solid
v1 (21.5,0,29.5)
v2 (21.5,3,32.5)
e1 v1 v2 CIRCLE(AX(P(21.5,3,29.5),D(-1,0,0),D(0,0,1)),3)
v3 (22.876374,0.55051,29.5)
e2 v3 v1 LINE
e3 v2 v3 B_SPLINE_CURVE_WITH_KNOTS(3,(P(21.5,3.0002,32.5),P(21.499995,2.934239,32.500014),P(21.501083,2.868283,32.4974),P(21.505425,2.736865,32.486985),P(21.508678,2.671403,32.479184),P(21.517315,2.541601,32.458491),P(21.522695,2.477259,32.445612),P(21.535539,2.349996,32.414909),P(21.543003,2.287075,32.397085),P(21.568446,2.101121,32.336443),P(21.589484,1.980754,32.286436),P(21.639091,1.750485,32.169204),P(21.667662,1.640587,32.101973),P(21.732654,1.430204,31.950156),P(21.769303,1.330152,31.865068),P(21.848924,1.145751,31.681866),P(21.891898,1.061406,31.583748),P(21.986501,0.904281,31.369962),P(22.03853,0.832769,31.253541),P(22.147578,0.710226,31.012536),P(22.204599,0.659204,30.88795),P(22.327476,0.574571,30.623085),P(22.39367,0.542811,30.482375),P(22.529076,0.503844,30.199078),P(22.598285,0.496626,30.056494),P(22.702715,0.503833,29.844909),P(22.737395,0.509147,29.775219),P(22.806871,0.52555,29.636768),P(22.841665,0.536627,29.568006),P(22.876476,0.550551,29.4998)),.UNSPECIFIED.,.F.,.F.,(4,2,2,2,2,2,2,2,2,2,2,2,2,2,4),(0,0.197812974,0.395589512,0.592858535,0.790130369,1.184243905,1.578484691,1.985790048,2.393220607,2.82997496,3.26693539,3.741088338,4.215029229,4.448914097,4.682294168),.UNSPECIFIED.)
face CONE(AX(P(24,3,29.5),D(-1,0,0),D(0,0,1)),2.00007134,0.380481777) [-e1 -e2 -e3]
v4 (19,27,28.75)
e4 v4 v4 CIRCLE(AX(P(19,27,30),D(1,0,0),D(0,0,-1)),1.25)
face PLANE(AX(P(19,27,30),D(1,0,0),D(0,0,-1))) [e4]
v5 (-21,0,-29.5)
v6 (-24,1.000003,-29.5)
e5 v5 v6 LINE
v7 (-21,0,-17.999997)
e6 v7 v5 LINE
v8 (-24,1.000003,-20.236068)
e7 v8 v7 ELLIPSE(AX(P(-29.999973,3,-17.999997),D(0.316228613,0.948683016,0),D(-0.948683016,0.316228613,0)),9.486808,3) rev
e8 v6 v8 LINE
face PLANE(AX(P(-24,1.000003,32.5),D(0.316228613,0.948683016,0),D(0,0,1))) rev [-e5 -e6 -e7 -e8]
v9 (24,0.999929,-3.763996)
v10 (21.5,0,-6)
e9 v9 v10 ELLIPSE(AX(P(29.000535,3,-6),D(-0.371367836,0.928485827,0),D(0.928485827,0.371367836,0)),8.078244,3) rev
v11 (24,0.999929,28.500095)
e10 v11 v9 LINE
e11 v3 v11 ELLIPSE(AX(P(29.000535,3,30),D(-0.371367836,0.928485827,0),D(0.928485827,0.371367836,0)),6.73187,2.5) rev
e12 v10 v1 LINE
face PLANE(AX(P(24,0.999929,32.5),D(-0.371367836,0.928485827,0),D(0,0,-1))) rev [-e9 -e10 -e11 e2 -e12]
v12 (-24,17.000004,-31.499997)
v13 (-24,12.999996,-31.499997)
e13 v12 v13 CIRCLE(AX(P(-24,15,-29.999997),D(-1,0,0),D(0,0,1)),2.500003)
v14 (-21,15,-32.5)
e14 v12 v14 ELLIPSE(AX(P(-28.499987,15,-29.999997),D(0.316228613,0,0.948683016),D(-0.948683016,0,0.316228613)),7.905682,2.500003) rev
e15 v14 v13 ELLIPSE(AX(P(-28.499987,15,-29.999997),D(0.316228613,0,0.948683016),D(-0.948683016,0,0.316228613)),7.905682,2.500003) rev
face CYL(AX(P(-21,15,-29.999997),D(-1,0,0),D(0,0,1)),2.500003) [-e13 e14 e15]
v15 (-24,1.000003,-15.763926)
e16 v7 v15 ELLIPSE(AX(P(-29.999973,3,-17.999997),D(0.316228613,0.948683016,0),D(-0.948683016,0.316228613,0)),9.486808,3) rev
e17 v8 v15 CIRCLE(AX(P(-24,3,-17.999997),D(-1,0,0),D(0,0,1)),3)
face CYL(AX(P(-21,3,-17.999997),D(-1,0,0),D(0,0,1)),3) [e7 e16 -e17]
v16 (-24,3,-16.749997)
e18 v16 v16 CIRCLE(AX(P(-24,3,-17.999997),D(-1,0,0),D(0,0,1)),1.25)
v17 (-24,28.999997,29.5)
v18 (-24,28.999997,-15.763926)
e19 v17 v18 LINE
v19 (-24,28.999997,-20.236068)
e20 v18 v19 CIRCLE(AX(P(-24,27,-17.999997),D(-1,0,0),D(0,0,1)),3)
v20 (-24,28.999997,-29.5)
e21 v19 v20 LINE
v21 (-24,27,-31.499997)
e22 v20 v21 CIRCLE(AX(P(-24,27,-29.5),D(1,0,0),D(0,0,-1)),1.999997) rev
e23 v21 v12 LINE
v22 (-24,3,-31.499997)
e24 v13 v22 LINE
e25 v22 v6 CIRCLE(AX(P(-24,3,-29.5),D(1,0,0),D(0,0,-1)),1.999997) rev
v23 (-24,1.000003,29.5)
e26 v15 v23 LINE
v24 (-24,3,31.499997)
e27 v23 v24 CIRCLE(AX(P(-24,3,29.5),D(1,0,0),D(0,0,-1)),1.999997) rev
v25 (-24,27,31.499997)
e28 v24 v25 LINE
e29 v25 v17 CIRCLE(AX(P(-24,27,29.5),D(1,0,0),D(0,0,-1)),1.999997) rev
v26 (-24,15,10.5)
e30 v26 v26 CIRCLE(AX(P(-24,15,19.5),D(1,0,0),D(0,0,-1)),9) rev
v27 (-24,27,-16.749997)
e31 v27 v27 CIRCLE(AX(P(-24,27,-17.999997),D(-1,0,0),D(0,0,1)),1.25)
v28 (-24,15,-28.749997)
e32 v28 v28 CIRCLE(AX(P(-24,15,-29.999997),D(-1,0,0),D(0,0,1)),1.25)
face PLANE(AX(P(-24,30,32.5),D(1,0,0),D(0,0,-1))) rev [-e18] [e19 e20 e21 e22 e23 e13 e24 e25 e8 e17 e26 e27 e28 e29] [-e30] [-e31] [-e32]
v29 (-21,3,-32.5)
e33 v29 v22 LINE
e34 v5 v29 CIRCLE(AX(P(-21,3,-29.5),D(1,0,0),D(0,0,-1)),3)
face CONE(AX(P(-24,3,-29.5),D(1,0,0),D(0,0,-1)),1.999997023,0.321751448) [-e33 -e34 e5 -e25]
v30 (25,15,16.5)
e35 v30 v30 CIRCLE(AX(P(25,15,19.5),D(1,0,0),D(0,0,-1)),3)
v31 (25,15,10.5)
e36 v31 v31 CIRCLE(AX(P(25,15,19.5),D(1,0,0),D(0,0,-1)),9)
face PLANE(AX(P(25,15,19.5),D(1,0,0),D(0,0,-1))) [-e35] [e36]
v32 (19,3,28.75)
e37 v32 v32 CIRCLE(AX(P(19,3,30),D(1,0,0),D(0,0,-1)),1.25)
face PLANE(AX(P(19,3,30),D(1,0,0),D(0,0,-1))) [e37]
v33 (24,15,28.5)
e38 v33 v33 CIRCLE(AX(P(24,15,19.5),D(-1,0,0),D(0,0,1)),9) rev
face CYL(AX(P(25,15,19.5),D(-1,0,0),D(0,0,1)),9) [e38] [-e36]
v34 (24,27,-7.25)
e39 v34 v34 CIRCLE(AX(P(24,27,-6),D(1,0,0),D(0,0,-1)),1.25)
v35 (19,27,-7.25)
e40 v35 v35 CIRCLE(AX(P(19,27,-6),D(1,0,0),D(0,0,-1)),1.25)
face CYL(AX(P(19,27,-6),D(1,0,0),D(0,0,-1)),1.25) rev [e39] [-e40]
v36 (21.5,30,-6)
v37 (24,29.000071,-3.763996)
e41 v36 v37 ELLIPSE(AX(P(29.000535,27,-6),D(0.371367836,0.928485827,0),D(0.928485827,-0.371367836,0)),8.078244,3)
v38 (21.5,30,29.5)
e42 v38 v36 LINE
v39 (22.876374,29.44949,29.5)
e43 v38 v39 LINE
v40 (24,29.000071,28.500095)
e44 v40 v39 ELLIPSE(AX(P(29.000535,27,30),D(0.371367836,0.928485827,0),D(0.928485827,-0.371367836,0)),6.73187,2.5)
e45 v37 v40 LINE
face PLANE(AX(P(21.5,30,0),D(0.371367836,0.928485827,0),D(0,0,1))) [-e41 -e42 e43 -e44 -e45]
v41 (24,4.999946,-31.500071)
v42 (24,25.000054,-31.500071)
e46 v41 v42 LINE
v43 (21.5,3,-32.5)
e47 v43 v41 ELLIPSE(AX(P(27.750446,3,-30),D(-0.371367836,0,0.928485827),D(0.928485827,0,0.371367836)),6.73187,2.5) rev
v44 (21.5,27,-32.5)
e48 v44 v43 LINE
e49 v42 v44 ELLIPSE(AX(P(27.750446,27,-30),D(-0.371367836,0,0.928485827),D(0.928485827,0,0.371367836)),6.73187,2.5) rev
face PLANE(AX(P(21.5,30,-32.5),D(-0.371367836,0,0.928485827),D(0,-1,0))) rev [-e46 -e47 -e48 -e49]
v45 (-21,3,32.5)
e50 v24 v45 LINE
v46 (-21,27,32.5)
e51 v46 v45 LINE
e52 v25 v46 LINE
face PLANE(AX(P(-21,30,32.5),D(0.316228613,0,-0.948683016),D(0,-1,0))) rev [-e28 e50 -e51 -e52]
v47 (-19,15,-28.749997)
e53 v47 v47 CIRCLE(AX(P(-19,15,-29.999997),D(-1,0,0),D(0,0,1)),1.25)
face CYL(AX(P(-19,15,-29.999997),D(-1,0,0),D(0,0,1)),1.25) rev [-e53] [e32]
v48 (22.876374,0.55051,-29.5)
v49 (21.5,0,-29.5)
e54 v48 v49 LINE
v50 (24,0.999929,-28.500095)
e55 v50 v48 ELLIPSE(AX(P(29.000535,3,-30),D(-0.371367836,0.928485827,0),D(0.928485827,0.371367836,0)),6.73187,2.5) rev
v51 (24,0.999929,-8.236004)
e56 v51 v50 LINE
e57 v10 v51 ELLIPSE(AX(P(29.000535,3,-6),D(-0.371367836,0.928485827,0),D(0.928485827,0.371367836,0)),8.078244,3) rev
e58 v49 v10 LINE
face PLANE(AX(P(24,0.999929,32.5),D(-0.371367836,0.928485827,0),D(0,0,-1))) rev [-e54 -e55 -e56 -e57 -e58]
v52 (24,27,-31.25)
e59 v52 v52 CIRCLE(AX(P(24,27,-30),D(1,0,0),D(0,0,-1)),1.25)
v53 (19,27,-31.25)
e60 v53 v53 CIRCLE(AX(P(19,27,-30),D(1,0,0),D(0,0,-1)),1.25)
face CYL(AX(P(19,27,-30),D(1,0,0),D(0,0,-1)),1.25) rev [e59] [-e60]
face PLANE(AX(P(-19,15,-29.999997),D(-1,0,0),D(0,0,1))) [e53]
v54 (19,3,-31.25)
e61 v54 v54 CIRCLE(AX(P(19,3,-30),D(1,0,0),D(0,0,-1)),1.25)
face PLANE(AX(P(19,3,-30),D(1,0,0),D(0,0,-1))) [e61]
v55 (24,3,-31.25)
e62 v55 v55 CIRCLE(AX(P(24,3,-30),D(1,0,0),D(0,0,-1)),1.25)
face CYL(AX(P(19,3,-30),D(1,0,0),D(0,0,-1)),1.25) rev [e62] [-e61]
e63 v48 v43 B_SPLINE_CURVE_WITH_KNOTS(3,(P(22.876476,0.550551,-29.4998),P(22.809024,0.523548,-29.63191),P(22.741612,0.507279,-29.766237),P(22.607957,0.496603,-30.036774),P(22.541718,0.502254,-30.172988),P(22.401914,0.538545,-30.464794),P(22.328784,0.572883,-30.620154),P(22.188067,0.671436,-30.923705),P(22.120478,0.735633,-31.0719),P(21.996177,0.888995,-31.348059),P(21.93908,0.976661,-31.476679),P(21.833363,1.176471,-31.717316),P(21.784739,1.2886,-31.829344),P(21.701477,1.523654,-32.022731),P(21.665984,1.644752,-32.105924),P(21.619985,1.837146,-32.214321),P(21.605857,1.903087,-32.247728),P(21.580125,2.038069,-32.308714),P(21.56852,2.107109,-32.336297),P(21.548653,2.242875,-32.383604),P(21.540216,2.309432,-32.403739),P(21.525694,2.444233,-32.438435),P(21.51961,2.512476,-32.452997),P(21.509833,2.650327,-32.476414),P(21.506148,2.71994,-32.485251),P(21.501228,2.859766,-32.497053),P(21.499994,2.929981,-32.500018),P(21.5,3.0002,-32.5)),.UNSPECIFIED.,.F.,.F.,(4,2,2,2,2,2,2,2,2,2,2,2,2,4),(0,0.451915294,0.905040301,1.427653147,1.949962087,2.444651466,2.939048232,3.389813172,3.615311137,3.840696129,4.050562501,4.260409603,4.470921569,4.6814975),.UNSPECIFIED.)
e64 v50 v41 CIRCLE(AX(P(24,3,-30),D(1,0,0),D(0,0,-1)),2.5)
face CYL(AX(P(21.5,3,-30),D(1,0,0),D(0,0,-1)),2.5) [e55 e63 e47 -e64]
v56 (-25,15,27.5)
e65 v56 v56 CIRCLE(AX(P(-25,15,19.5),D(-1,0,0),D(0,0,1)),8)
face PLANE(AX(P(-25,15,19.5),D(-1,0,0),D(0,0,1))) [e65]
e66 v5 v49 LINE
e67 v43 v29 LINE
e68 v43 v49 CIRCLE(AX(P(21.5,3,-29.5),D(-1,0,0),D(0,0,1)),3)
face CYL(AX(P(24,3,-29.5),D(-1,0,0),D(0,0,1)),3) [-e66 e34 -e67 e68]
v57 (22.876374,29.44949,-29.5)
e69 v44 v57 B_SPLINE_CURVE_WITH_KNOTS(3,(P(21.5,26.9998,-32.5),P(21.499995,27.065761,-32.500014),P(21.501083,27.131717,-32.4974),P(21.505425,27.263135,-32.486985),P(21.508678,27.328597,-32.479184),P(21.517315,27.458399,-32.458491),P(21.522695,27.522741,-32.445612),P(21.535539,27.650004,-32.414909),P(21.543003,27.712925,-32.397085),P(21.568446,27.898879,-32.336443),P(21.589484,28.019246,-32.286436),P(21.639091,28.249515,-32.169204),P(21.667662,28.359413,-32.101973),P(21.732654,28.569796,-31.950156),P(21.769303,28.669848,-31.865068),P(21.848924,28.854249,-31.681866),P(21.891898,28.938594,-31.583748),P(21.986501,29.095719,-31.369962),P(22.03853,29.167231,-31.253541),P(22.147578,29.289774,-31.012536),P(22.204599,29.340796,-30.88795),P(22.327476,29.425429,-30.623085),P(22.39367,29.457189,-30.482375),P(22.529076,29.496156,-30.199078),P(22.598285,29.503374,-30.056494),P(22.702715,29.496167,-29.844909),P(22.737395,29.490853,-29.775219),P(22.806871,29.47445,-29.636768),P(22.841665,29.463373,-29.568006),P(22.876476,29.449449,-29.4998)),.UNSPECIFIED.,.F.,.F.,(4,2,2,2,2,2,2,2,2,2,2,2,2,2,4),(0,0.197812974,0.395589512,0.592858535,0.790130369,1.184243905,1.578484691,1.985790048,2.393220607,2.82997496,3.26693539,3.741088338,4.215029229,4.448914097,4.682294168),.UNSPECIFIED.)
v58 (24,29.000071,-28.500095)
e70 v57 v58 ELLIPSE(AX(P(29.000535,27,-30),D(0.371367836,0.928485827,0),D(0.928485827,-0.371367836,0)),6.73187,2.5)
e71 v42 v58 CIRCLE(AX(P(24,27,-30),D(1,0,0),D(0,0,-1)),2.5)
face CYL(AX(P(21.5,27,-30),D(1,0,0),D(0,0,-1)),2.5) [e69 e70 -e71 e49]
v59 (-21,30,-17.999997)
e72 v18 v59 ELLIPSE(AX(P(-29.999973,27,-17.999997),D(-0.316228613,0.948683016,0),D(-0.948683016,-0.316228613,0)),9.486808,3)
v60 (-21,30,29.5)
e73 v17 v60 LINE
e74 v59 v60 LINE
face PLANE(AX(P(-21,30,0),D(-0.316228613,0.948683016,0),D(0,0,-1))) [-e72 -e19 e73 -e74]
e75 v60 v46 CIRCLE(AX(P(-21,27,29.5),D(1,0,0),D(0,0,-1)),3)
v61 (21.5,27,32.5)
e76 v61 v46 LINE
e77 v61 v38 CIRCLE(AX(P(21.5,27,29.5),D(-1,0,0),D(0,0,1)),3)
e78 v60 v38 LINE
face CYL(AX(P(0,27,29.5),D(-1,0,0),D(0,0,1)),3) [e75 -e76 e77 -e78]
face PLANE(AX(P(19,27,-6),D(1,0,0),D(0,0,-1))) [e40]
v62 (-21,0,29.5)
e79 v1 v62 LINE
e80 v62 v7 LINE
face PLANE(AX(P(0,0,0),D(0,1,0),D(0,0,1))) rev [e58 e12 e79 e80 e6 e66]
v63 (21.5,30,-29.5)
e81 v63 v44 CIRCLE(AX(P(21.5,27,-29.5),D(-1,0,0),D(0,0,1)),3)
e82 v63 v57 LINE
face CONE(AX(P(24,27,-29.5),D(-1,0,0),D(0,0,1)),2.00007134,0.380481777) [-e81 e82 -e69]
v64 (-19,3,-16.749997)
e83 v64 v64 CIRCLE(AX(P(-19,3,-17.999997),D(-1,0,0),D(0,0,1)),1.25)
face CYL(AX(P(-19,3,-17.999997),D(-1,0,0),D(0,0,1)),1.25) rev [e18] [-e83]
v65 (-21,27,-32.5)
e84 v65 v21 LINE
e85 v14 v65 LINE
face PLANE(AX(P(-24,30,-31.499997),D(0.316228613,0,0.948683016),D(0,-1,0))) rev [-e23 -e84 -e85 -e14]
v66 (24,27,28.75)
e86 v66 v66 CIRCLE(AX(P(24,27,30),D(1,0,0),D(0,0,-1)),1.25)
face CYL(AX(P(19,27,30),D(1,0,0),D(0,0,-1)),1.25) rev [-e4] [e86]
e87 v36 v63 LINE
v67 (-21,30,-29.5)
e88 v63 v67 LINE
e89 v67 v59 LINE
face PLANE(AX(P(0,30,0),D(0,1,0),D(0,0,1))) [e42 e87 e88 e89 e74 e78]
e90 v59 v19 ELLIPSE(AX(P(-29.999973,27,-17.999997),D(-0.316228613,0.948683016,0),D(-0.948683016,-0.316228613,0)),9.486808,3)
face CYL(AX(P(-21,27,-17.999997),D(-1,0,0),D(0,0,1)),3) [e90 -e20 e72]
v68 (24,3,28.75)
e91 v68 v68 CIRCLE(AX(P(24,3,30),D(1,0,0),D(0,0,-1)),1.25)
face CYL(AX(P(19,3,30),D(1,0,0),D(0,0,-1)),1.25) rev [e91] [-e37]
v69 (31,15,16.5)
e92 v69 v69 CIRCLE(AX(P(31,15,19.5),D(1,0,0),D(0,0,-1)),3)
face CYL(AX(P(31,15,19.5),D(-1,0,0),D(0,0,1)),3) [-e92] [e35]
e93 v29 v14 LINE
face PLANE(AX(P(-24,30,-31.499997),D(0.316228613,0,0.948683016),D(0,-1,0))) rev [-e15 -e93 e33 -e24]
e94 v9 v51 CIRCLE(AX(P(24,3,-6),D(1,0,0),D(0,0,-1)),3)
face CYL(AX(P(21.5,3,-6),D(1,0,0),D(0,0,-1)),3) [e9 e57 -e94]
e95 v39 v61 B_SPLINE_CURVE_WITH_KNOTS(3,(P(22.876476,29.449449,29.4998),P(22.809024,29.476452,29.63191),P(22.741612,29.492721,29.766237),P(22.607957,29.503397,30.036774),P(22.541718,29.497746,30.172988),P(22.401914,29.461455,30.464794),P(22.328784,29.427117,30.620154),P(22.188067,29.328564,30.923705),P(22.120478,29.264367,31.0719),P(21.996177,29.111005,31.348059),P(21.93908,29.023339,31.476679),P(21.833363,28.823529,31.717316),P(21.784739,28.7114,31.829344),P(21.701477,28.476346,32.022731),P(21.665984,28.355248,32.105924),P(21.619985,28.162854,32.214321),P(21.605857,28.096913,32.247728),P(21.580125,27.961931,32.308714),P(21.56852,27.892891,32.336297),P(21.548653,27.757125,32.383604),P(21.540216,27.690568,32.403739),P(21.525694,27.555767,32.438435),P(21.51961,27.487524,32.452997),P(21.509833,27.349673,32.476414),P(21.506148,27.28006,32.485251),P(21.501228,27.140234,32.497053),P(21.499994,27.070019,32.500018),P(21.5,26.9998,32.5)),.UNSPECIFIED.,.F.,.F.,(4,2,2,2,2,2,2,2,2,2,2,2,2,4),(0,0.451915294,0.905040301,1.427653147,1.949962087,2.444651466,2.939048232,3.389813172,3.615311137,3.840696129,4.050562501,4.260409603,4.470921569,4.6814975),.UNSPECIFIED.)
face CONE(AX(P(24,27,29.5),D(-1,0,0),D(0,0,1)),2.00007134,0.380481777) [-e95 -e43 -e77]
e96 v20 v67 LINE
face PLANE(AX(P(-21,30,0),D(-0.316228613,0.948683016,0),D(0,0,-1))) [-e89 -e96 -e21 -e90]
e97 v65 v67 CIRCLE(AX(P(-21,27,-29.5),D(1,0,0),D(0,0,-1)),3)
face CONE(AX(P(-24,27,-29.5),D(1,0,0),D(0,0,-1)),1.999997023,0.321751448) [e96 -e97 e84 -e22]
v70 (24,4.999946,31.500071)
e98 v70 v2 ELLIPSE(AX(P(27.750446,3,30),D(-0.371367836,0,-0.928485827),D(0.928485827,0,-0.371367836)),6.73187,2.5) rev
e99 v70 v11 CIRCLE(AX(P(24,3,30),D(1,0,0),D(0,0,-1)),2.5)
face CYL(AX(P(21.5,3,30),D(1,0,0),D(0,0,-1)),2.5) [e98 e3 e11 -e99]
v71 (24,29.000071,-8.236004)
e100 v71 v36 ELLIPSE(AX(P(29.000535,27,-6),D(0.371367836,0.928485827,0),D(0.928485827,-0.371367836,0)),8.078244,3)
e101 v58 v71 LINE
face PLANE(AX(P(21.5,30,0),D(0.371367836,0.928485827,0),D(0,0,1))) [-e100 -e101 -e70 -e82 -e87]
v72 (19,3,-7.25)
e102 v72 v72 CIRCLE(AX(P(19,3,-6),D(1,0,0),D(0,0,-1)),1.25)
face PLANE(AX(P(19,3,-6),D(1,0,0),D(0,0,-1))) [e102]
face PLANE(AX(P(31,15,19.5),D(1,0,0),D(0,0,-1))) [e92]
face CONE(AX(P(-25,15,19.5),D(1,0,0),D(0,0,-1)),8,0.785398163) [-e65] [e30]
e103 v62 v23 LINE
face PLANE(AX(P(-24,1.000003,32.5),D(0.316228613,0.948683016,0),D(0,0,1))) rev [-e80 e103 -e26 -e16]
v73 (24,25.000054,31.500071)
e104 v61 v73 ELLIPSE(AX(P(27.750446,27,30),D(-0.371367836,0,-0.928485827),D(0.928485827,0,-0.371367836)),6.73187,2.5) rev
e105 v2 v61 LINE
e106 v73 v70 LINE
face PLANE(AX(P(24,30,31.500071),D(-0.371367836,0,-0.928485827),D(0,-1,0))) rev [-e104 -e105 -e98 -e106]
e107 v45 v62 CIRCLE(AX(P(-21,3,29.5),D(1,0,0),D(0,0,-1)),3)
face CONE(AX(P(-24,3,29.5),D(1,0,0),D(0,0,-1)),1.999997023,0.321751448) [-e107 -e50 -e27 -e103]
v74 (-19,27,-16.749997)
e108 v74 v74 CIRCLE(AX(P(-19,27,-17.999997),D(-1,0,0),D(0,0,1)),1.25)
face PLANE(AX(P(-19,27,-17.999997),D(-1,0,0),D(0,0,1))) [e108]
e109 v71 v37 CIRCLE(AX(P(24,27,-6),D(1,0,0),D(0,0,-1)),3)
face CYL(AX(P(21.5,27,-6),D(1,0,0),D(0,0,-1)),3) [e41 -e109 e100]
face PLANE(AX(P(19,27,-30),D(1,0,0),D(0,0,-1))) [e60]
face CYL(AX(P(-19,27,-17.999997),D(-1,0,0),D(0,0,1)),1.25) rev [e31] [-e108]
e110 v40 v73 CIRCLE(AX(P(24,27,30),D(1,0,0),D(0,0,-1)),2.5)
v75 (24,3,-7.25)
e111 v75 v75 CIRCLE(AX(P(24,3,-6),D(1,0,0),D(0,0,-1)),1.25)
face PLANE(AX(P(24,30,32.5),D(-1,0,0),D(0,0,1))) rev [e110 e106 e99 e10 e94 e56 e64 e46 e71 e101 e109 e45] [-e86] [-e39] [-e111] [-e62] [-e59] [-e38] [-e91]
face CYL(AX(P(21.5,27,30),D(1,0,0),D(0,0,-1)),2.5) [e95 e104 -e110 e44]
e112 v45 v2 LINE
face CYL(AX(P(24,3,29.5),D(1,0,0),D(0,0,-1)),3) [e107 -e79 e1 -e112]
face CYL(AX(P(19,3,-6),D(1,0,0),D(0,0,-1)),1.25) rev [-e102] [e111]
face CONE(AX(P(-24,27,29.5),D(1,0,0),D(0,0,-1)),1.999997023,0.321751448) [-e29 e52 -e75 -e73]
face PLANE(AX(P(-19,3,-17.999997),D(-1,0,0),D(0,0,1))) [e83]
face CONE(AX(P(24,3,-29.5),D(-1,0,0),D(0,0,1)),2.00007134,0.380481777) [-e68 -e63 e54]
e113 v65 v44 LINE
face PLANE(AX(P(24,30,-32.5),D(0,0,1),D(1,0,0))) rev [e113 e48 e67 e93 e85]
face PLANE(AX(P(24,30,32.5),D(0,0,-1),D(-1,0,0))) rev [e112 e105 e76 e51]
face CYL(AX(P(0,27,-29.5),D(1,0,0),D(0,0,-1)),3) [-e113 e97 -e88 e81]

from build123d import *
from OCP.BRepFilletAPI import BRepFilletAPI_MakeChamfer

# Parameters (mm, degrees)
SKETCH1_W           = 48
SKETCH1_H           = 65
BOSS_EXTRUDE1_DEPTH = 30
FILLET2_R           = 3
SKETCH2_R           = 9
BOSS_EXTRUDE2_DEPTH = 1
BOSS_EXTRUDE4_START = 1
SKETCH4_R           = 9
BOSS_EXTRUDE4_DEPTH = 1
SKETCH5_R           = 3
BOSS_EXTRUDE5_DEPTH = 6
CHAMFER1_SIZE       = 3
CHAMFER1_SIZE2      = 1.000002977
CHAMFER2_SIZE       = 1
CHAMFER3_SIZE       = 2.5
CHAMFER3_SIZE2      = 0.99992866
SKETCH6_R           = 3
SKETCH6_R_2         = 2.5
BOSS_EXTRUDE6_DEPTH = 2.5
SKETCH7_R           = 2.500002977
SKETCH7_R_2         = 3
BOSS_EXTRUDE7_DEPTH = 3
SKETCH8_R           = 1.25
CUT_EXTRUDE1_DEPTH  = 5
SKETCH10_R          = 1.25
CUT_EXTRUDE2_DEPTH  = 5


with BuildPart() as part:
    # Sketch1 → Boss-Extrude1 (new body)
    with BuildSketch(Plane(origin=(0, 0, 0), x_dir=(1, 0, 0), z_dir=(0, 1, 0))):
        Rectangle(SKETCH1_W, SKETCH1_H)
    extrude(amount=BOSS_EXTRUDE1_DEPTH)

    # Fillet2
    fillet2_edges = [part.edges().sort_by_distance(p)[0] for p in [
        (0, 30, -32.5),
        (0, 0, -32.5),
        (0, 0, 32.5),
        (0, 30, 32.5),
    ]]
    fillet(fillet2_edges, radius=FILLET2_R)

    # Sketch2 → Boss-Extrude2 (add)
    with BuildSketch(Plane.ZY.offset(24)):
        with Locations(Location((19.5, 15, 0), (0, 0, 180))):
            Circle(SKETCH2_R)
    extrude(amount=BOSS_EXTRUDE2_DEPTH)

    # Sketch4 → Boss-Extrude4 (add)
    with BuildSketch(Plane(origin=(24, 0, 0), x_dir=(0, 0, -1), z_dir=(1, 0, 0)).offset(BOSS_EXTRUDE4_START)):
        with Locations((-19.5, 15)):
            Circle(SKETCH4_R)
    extrude(amount=-BOSS_EXTRUDE4_DEPTH)

    # Sketch5 → Boss-Extrude5 (add)
    with BuildSketch(Plane(origin=(25, 0, 0), x_dir=(0, 0, -1), z_dir=(1, 0, 0))):
        with Locations((-19.5, 15)):
            Circle(SKETCH5_R)
    extrude(amount=BOSS_EXTRUDE5_DEPTH)

    # Chamfer1: one chamfer whose edges measure the first distance from different faces: ONE call of the kernel's chamfer builder (chamfer() names one face for all edges)
    chamfer1_edges_1 = [part.edges().sort_by_distance(p)[0] for p in [
        (-24, 30, 0),
    ]]
    chamfer1_side_1 = [part.faces().sort_by_distance(p)[0] for p in [
        (0, 30, 0),
    ]]
    chamfer1_edges_2 = [part.edges().sort_by_distance(p)[0] for p in [
        (-24, 0, 0),
    ]]
    chamfer1_side_2 = [part.faces().sort_by_distance(p)[0] for p in [
        (0, 0, 0),
    ]]
    chamfer1_edges_3 = [part.edges().sort_by_distance(p)[0] for p in [
        (-24, 15, 32.5),
    ]]
    chamfer1_side_3 = [part.faces().sort_by_distance(p)[0] for p in [
        (0, 15, 32.5),
    ]]
    chamfer1_edges_4 = [part.edges().sort_by_distance(p)[0] for p in [
        (-24, 15, -32.5),
    ]]
    chamfer1_side_4 = [part.faces().sort_by_distance(p)[0] for p in [
        (0, 15, -32.5),
    ]]
    chamfer1_edges_5 = [part.edges().sort_by_distance(p)[0] for p in [
        (-24, 29.121320344, 31.621320344),
    ]]
    chamfer1_side_5 = [part.faces().sort_by_distance(p)[0] for p in [
        (0, 29.121320344, 31.621320344),
    ]]
    chamfer1_edges_6 = [part.edges().sort_by_distance(p)[0] for p in [
        (-24, 0.878679656, 31.621320344),
    ]]
    chamfer1_side_6 = [part.faces().sort_by_distance(p)[0] for p in [
        (0, 0.878679656, 31.621320344),
    ]]
    chamfer1_edges_7 = [part.edges().sort_by_distance(p)[0] for p in [
        (-24, 0.878679656, -31.621320344),
    ]]
    chamfer1_side_7 = [part.faces().sort_by_distance(p)[0] for p in [
        (0, 0.878679656, -31.621320344),
    ]]
    chamfer1_edges_8 = [part.edges().sort_by_distance(p)[0] for p in [
        (-24, 29.121320344, -31.621320344),
    ]]
    chamfer1_side_8 = [part.faces().sort_by_distance(p)[0] for p in [
        (0, 29.121320344, -31.621320344),
    ]]
    chamfer1 = BRepFilletAPI_MakeChamfer(part.part.solid().wrapped)
    for e in chamfer1_edges_1:
        chamfer1.Add(CHAMFER1_SIZE, CHAMFER1_SIZE2, e.wrapped, chamfer1_side_1[0].wrapped)  # the first distance lies on this face
    for e in chamfer1_edges_2:
        chamfer1.Add(CHAMFER1_SIZE, CHAMFER1_SIZE2, e.wrapped, chamfer1_side_2[0].wrapped)  # the first distance lies on this face
    for e in chamfer1_edges_3:
        chamfer1.Add(CHAMFER1_SIZE, CHAMFER1_SIZE2, e.wrapped, chamfer1_side_3[0].wrapped)  # the first distance lies on this face
    for e in chamfer1_edges_4:
        chamfer1.Add(CHAMFER1_SIZE, CHAMFER1_SIZE2, e.wrapped, chamfer1_side_4[0].wrapped)  # the first distance lies on this face
    for e in chamfer1_edges_5:
        chamfer1.Add(CHAMFER1_SIZE, CHAMFER1_SIZE2, e.wrapped, chamfer1_side_5[0].wrapped)  # the first distance lies on this face
    for e in chamfer1_edges_6:
        chamfer1.Add(CHAMFER1_SIZE, CHAMFER1_SIZE2, e.wrapped, chamfer1_side_6[0].wrapped)  # the first distance lies on this face
    for e in chamfer1_edges_7:
        chamfer1.Add(CHAMFER1_SIZE, CHAMFER1_SIZE2, e.wrapped, chamfer1_side_7[0].wrapped)  # the first distance lies on this face
    for e in chamfer1_edges_8:
        chamfer1.Add(CHAMFER1_SIZE, CHAMFER1_SIZE2, e.wrapped, chamfer1_side_8[0].wrapped)  # the first distance lies on this face
    add(Compound.cast(chamfer1.Shape()), mode=Mode.REPLACE)

    # Chamfer2
    chamfer2_edges = [part.edges().sort_by_distance(p)[0] for p in [
        (-25, 15, 28.5),
    ]]
    chamfer(chamfer2_edges, length=CHAMFER2_SIZE - 0.0001)  # a hair under: the kernel refuses the full size

    # Chamfer3: one chamfer whose edges measure the first distance from different faces: ONE call of the kernel's chamfer builder (chamfer() names one face for all edges)
    chamfer3_edges_1 = [part.edges().sort_by_distance(p)[0] for p in [
        (24, 30, 0),
    ]]
    chamfer3_side_1 = [part.faces().sort_by_distance(p)[0] for p in [
        (1.5, 30, 0),
    ]]
    chamfer3_edges_2 = [part.edges().sort_by_distance(p)[0] for p in [
        (24, 15, -32.5),
    ]]
    chamfer3_side_2 = [part.faces().sort_by_distance(p)[0] for p in [
        (1.5, 15, -32.5),
    ]]
    chamfer3_edges_3 = [part.edges().sort_by_distance(p)[0] for p in [
        (24, 0, 0),
    ]]
    chamfer3_side_3 = [part.faces().sort_by_distance(p)[0] for p in [
        (1.5, 0, 0),
    ]]
    chamfer3_edges_4 = [part.edges().sort_by_distance(p)[0] for p in [
        (24, 15, 32.5),
    ]]
    chamfer3_side_4 = [part.faces().sort_by_distance(p)[0] for p in [
        (1.5, 15, 32.5),
    ]]
    chamfer3_edges_5 = [part.edges().sort_by_distance(p)[0] for p in [
        (24, 29.121320344, 31.621320344),
    ]]
    chamfer3_side_5 = [part.faces().sort_by_distance(p)[0] for p in [
        (1.5, 29.121320344, 31.621320344),
    ]]
    chamfer3_edges_6 = [part.edges().sort_by_distance(p)[0] for p in [
        (24, 0.878679656, 31.621320344),
    ]]
    chamfer3_side_6 = [part.faces().sort_by_distance(p)[0] for p in [
        (1.5, 0.878679656, 31.621320344),
    ]]
    chamfer3_edges_7 = [part.edges().sort_by_distance(p)[0] for p in [
        (24, 0.878679656, -31.621320344),
    ]]
    chamfer3_side_7 = [part.faces().sort_by_distance(p)[0] for p in [
        (1.5, 0.878679656, -31.621320344),
    ]]
    chamfer3_edges_8 = [part.edges().sort_by_distance(p)[0] for p in [
        (24, 29.121320344, -31.621320344),
    ]]
    chamfer3_side_8 = [part.faces().sort_by_distance(p)[0] for p in [
        (1.5, 29.121320344, -31.621320344),
    ]]
    chamfer3 = BRepFilletAPI_MakeChamfer(part.part.solid().wrapped)
    for e in chamfer3_edges_1:
        chamfer3.Add(CHAMFER3_SIZE, CHAMFER3_SIZE2, e.wrapped, chamfer3_side_1[0].wrapped)  # the first distance lies on this face
    for e in chamfer3_edges_2:
        chamfer3.Add(CHAMFER3_SIZE, CHAMFER3_SIZE2, e.wrapped, chamfer3_side_2[0].wrapped)  # the first distance lies on this face
    for e in chamfer3_edges_3:
        chamfer3.Add(CHAMFER3_SIZE, CHAMFER3_SIZE2, e.wrapped, chamfer3_side_3[0].wrapped)  # the first distance lies on this face
    for e in chamfer3_edges_4:
        chamfer3.Add(CHAMFER3_SIZE, CHAMFER3_SIZE2, e.wrapped, chamfer3_side_4[0].wrapped)  # the first distance lies on this face
    for e in chamfer3_edges_5:
        chamfer3.Add(CHAMFER3_SIZE, CHAMFER3_SIZE2, e.wrapped, chamfer3_side_5[0].wrapped)  # the first distance lies on this face
    for e in chamfer3_edges_6:
        chamfer3.Add(CHAMFER3_SIZE, CHAMFER3_SIZE2, e.wrapped, chamfer3_side_6[0].wrapped)  # the first distance lies on this face
    for e in chamfer3_edges_7:
        chamfer3.Add(CHAMFER3_SIZE, CHAMFER3_SIZE2, e.wrapped, chamfer3_side_7[0].wrapped)  # the first distance lies on this face
    for e in chamfer3_edges_8:
        chamfer3.Add(CHAMFER3_SIZE, CHAMFER3_SIZE2, e.wrapped, chamfer3_side_8[0].wrapped)  # the first distance lies on this face
    add(Compound.cast(chamfer3.Shape()), mode=Mode.REPLACE)

    # Sketch6 → Boss-Extrude6 (add)
    with BuildSketch(Plane(origin=(24, 0, 0), x_dir=(0, 0, -1), z_dir=(1, 0, 0))):
        with Locations((6, 27)):
            Circle(SKETCH6_R)
        with Locations((6, 3)):
            Circle(SKETCH6_R)
        with Locations((-30, 3)):
            Circle(SKETCH6_R_2)
        with Locations((-30, 27)):
            Circle(SKETCH6_R_2)
        with Locations((30, 27)):
            Circle(SKETCH6_R_2)
        with Locations((30, 3)):
            Circle(SKETCH6_R_2)
    extrude(amount=-BOSS_EXTRUDE6_DEPTH)

    # Sketch7 → Boss-Extrude7 (add)
    with BuildSketch(Plane.ZY.offset(24)):
        with Locations((-29.999997023, 15)):
            Circle(SKETCH7_R)
        with Locations((-17.999997023, 3)):
            Circle(SKETCH7_R_2)
        with Locations((-17.999997023, 27)):
            Circle(SKETCH7_R_2)
    extrude(amount=-BOSS_EXTRUDE7_DEPTH)

    # Sketch8 → Cut-Extrude1 (cut)
    with BuildSketch(Plane.ZY.offset(24)):
        with Locations((-17.999997023, 27)):
            Circle(SKETCH8_R)
        with Locations((-29.999997023, 15)):
            Circle(SKETCH8_R)
        with Locations((-17.999997023, 3)):
            Circle(SKETCH8_R)
    extrude(amount=-CUT_EXTRUDE1_DEPTH, mode=Mode.SUBTRACT)

    # Sketch10 → Cut-Extrude2 (cut)
    with BuildSketch(Plane(origin=(24, 0, 0), x_dir=(0, 0, -1), z_dir=(1, 0, 0))):
        with Locations((6, 3)):
            Circle(SKETCH10_R)
        with Locations((30, 3)):
            Circle(SKETCH10_R)
        with Locations((6, 27)):
            Circle(SKETCH10_R)
        with Locations((30, 27)):
            Circle(SKETCH10_R)
        with Locations((-30, 3)):
            Circle(SKETCH10_R)
        with Locations((-30, 27)):
            Circle(SKETCH10_R)
    extrude(amount=-CUT_EXTRUDE2_DEPTH, mode=Mode.SUBTRACT)


solid = part.part
